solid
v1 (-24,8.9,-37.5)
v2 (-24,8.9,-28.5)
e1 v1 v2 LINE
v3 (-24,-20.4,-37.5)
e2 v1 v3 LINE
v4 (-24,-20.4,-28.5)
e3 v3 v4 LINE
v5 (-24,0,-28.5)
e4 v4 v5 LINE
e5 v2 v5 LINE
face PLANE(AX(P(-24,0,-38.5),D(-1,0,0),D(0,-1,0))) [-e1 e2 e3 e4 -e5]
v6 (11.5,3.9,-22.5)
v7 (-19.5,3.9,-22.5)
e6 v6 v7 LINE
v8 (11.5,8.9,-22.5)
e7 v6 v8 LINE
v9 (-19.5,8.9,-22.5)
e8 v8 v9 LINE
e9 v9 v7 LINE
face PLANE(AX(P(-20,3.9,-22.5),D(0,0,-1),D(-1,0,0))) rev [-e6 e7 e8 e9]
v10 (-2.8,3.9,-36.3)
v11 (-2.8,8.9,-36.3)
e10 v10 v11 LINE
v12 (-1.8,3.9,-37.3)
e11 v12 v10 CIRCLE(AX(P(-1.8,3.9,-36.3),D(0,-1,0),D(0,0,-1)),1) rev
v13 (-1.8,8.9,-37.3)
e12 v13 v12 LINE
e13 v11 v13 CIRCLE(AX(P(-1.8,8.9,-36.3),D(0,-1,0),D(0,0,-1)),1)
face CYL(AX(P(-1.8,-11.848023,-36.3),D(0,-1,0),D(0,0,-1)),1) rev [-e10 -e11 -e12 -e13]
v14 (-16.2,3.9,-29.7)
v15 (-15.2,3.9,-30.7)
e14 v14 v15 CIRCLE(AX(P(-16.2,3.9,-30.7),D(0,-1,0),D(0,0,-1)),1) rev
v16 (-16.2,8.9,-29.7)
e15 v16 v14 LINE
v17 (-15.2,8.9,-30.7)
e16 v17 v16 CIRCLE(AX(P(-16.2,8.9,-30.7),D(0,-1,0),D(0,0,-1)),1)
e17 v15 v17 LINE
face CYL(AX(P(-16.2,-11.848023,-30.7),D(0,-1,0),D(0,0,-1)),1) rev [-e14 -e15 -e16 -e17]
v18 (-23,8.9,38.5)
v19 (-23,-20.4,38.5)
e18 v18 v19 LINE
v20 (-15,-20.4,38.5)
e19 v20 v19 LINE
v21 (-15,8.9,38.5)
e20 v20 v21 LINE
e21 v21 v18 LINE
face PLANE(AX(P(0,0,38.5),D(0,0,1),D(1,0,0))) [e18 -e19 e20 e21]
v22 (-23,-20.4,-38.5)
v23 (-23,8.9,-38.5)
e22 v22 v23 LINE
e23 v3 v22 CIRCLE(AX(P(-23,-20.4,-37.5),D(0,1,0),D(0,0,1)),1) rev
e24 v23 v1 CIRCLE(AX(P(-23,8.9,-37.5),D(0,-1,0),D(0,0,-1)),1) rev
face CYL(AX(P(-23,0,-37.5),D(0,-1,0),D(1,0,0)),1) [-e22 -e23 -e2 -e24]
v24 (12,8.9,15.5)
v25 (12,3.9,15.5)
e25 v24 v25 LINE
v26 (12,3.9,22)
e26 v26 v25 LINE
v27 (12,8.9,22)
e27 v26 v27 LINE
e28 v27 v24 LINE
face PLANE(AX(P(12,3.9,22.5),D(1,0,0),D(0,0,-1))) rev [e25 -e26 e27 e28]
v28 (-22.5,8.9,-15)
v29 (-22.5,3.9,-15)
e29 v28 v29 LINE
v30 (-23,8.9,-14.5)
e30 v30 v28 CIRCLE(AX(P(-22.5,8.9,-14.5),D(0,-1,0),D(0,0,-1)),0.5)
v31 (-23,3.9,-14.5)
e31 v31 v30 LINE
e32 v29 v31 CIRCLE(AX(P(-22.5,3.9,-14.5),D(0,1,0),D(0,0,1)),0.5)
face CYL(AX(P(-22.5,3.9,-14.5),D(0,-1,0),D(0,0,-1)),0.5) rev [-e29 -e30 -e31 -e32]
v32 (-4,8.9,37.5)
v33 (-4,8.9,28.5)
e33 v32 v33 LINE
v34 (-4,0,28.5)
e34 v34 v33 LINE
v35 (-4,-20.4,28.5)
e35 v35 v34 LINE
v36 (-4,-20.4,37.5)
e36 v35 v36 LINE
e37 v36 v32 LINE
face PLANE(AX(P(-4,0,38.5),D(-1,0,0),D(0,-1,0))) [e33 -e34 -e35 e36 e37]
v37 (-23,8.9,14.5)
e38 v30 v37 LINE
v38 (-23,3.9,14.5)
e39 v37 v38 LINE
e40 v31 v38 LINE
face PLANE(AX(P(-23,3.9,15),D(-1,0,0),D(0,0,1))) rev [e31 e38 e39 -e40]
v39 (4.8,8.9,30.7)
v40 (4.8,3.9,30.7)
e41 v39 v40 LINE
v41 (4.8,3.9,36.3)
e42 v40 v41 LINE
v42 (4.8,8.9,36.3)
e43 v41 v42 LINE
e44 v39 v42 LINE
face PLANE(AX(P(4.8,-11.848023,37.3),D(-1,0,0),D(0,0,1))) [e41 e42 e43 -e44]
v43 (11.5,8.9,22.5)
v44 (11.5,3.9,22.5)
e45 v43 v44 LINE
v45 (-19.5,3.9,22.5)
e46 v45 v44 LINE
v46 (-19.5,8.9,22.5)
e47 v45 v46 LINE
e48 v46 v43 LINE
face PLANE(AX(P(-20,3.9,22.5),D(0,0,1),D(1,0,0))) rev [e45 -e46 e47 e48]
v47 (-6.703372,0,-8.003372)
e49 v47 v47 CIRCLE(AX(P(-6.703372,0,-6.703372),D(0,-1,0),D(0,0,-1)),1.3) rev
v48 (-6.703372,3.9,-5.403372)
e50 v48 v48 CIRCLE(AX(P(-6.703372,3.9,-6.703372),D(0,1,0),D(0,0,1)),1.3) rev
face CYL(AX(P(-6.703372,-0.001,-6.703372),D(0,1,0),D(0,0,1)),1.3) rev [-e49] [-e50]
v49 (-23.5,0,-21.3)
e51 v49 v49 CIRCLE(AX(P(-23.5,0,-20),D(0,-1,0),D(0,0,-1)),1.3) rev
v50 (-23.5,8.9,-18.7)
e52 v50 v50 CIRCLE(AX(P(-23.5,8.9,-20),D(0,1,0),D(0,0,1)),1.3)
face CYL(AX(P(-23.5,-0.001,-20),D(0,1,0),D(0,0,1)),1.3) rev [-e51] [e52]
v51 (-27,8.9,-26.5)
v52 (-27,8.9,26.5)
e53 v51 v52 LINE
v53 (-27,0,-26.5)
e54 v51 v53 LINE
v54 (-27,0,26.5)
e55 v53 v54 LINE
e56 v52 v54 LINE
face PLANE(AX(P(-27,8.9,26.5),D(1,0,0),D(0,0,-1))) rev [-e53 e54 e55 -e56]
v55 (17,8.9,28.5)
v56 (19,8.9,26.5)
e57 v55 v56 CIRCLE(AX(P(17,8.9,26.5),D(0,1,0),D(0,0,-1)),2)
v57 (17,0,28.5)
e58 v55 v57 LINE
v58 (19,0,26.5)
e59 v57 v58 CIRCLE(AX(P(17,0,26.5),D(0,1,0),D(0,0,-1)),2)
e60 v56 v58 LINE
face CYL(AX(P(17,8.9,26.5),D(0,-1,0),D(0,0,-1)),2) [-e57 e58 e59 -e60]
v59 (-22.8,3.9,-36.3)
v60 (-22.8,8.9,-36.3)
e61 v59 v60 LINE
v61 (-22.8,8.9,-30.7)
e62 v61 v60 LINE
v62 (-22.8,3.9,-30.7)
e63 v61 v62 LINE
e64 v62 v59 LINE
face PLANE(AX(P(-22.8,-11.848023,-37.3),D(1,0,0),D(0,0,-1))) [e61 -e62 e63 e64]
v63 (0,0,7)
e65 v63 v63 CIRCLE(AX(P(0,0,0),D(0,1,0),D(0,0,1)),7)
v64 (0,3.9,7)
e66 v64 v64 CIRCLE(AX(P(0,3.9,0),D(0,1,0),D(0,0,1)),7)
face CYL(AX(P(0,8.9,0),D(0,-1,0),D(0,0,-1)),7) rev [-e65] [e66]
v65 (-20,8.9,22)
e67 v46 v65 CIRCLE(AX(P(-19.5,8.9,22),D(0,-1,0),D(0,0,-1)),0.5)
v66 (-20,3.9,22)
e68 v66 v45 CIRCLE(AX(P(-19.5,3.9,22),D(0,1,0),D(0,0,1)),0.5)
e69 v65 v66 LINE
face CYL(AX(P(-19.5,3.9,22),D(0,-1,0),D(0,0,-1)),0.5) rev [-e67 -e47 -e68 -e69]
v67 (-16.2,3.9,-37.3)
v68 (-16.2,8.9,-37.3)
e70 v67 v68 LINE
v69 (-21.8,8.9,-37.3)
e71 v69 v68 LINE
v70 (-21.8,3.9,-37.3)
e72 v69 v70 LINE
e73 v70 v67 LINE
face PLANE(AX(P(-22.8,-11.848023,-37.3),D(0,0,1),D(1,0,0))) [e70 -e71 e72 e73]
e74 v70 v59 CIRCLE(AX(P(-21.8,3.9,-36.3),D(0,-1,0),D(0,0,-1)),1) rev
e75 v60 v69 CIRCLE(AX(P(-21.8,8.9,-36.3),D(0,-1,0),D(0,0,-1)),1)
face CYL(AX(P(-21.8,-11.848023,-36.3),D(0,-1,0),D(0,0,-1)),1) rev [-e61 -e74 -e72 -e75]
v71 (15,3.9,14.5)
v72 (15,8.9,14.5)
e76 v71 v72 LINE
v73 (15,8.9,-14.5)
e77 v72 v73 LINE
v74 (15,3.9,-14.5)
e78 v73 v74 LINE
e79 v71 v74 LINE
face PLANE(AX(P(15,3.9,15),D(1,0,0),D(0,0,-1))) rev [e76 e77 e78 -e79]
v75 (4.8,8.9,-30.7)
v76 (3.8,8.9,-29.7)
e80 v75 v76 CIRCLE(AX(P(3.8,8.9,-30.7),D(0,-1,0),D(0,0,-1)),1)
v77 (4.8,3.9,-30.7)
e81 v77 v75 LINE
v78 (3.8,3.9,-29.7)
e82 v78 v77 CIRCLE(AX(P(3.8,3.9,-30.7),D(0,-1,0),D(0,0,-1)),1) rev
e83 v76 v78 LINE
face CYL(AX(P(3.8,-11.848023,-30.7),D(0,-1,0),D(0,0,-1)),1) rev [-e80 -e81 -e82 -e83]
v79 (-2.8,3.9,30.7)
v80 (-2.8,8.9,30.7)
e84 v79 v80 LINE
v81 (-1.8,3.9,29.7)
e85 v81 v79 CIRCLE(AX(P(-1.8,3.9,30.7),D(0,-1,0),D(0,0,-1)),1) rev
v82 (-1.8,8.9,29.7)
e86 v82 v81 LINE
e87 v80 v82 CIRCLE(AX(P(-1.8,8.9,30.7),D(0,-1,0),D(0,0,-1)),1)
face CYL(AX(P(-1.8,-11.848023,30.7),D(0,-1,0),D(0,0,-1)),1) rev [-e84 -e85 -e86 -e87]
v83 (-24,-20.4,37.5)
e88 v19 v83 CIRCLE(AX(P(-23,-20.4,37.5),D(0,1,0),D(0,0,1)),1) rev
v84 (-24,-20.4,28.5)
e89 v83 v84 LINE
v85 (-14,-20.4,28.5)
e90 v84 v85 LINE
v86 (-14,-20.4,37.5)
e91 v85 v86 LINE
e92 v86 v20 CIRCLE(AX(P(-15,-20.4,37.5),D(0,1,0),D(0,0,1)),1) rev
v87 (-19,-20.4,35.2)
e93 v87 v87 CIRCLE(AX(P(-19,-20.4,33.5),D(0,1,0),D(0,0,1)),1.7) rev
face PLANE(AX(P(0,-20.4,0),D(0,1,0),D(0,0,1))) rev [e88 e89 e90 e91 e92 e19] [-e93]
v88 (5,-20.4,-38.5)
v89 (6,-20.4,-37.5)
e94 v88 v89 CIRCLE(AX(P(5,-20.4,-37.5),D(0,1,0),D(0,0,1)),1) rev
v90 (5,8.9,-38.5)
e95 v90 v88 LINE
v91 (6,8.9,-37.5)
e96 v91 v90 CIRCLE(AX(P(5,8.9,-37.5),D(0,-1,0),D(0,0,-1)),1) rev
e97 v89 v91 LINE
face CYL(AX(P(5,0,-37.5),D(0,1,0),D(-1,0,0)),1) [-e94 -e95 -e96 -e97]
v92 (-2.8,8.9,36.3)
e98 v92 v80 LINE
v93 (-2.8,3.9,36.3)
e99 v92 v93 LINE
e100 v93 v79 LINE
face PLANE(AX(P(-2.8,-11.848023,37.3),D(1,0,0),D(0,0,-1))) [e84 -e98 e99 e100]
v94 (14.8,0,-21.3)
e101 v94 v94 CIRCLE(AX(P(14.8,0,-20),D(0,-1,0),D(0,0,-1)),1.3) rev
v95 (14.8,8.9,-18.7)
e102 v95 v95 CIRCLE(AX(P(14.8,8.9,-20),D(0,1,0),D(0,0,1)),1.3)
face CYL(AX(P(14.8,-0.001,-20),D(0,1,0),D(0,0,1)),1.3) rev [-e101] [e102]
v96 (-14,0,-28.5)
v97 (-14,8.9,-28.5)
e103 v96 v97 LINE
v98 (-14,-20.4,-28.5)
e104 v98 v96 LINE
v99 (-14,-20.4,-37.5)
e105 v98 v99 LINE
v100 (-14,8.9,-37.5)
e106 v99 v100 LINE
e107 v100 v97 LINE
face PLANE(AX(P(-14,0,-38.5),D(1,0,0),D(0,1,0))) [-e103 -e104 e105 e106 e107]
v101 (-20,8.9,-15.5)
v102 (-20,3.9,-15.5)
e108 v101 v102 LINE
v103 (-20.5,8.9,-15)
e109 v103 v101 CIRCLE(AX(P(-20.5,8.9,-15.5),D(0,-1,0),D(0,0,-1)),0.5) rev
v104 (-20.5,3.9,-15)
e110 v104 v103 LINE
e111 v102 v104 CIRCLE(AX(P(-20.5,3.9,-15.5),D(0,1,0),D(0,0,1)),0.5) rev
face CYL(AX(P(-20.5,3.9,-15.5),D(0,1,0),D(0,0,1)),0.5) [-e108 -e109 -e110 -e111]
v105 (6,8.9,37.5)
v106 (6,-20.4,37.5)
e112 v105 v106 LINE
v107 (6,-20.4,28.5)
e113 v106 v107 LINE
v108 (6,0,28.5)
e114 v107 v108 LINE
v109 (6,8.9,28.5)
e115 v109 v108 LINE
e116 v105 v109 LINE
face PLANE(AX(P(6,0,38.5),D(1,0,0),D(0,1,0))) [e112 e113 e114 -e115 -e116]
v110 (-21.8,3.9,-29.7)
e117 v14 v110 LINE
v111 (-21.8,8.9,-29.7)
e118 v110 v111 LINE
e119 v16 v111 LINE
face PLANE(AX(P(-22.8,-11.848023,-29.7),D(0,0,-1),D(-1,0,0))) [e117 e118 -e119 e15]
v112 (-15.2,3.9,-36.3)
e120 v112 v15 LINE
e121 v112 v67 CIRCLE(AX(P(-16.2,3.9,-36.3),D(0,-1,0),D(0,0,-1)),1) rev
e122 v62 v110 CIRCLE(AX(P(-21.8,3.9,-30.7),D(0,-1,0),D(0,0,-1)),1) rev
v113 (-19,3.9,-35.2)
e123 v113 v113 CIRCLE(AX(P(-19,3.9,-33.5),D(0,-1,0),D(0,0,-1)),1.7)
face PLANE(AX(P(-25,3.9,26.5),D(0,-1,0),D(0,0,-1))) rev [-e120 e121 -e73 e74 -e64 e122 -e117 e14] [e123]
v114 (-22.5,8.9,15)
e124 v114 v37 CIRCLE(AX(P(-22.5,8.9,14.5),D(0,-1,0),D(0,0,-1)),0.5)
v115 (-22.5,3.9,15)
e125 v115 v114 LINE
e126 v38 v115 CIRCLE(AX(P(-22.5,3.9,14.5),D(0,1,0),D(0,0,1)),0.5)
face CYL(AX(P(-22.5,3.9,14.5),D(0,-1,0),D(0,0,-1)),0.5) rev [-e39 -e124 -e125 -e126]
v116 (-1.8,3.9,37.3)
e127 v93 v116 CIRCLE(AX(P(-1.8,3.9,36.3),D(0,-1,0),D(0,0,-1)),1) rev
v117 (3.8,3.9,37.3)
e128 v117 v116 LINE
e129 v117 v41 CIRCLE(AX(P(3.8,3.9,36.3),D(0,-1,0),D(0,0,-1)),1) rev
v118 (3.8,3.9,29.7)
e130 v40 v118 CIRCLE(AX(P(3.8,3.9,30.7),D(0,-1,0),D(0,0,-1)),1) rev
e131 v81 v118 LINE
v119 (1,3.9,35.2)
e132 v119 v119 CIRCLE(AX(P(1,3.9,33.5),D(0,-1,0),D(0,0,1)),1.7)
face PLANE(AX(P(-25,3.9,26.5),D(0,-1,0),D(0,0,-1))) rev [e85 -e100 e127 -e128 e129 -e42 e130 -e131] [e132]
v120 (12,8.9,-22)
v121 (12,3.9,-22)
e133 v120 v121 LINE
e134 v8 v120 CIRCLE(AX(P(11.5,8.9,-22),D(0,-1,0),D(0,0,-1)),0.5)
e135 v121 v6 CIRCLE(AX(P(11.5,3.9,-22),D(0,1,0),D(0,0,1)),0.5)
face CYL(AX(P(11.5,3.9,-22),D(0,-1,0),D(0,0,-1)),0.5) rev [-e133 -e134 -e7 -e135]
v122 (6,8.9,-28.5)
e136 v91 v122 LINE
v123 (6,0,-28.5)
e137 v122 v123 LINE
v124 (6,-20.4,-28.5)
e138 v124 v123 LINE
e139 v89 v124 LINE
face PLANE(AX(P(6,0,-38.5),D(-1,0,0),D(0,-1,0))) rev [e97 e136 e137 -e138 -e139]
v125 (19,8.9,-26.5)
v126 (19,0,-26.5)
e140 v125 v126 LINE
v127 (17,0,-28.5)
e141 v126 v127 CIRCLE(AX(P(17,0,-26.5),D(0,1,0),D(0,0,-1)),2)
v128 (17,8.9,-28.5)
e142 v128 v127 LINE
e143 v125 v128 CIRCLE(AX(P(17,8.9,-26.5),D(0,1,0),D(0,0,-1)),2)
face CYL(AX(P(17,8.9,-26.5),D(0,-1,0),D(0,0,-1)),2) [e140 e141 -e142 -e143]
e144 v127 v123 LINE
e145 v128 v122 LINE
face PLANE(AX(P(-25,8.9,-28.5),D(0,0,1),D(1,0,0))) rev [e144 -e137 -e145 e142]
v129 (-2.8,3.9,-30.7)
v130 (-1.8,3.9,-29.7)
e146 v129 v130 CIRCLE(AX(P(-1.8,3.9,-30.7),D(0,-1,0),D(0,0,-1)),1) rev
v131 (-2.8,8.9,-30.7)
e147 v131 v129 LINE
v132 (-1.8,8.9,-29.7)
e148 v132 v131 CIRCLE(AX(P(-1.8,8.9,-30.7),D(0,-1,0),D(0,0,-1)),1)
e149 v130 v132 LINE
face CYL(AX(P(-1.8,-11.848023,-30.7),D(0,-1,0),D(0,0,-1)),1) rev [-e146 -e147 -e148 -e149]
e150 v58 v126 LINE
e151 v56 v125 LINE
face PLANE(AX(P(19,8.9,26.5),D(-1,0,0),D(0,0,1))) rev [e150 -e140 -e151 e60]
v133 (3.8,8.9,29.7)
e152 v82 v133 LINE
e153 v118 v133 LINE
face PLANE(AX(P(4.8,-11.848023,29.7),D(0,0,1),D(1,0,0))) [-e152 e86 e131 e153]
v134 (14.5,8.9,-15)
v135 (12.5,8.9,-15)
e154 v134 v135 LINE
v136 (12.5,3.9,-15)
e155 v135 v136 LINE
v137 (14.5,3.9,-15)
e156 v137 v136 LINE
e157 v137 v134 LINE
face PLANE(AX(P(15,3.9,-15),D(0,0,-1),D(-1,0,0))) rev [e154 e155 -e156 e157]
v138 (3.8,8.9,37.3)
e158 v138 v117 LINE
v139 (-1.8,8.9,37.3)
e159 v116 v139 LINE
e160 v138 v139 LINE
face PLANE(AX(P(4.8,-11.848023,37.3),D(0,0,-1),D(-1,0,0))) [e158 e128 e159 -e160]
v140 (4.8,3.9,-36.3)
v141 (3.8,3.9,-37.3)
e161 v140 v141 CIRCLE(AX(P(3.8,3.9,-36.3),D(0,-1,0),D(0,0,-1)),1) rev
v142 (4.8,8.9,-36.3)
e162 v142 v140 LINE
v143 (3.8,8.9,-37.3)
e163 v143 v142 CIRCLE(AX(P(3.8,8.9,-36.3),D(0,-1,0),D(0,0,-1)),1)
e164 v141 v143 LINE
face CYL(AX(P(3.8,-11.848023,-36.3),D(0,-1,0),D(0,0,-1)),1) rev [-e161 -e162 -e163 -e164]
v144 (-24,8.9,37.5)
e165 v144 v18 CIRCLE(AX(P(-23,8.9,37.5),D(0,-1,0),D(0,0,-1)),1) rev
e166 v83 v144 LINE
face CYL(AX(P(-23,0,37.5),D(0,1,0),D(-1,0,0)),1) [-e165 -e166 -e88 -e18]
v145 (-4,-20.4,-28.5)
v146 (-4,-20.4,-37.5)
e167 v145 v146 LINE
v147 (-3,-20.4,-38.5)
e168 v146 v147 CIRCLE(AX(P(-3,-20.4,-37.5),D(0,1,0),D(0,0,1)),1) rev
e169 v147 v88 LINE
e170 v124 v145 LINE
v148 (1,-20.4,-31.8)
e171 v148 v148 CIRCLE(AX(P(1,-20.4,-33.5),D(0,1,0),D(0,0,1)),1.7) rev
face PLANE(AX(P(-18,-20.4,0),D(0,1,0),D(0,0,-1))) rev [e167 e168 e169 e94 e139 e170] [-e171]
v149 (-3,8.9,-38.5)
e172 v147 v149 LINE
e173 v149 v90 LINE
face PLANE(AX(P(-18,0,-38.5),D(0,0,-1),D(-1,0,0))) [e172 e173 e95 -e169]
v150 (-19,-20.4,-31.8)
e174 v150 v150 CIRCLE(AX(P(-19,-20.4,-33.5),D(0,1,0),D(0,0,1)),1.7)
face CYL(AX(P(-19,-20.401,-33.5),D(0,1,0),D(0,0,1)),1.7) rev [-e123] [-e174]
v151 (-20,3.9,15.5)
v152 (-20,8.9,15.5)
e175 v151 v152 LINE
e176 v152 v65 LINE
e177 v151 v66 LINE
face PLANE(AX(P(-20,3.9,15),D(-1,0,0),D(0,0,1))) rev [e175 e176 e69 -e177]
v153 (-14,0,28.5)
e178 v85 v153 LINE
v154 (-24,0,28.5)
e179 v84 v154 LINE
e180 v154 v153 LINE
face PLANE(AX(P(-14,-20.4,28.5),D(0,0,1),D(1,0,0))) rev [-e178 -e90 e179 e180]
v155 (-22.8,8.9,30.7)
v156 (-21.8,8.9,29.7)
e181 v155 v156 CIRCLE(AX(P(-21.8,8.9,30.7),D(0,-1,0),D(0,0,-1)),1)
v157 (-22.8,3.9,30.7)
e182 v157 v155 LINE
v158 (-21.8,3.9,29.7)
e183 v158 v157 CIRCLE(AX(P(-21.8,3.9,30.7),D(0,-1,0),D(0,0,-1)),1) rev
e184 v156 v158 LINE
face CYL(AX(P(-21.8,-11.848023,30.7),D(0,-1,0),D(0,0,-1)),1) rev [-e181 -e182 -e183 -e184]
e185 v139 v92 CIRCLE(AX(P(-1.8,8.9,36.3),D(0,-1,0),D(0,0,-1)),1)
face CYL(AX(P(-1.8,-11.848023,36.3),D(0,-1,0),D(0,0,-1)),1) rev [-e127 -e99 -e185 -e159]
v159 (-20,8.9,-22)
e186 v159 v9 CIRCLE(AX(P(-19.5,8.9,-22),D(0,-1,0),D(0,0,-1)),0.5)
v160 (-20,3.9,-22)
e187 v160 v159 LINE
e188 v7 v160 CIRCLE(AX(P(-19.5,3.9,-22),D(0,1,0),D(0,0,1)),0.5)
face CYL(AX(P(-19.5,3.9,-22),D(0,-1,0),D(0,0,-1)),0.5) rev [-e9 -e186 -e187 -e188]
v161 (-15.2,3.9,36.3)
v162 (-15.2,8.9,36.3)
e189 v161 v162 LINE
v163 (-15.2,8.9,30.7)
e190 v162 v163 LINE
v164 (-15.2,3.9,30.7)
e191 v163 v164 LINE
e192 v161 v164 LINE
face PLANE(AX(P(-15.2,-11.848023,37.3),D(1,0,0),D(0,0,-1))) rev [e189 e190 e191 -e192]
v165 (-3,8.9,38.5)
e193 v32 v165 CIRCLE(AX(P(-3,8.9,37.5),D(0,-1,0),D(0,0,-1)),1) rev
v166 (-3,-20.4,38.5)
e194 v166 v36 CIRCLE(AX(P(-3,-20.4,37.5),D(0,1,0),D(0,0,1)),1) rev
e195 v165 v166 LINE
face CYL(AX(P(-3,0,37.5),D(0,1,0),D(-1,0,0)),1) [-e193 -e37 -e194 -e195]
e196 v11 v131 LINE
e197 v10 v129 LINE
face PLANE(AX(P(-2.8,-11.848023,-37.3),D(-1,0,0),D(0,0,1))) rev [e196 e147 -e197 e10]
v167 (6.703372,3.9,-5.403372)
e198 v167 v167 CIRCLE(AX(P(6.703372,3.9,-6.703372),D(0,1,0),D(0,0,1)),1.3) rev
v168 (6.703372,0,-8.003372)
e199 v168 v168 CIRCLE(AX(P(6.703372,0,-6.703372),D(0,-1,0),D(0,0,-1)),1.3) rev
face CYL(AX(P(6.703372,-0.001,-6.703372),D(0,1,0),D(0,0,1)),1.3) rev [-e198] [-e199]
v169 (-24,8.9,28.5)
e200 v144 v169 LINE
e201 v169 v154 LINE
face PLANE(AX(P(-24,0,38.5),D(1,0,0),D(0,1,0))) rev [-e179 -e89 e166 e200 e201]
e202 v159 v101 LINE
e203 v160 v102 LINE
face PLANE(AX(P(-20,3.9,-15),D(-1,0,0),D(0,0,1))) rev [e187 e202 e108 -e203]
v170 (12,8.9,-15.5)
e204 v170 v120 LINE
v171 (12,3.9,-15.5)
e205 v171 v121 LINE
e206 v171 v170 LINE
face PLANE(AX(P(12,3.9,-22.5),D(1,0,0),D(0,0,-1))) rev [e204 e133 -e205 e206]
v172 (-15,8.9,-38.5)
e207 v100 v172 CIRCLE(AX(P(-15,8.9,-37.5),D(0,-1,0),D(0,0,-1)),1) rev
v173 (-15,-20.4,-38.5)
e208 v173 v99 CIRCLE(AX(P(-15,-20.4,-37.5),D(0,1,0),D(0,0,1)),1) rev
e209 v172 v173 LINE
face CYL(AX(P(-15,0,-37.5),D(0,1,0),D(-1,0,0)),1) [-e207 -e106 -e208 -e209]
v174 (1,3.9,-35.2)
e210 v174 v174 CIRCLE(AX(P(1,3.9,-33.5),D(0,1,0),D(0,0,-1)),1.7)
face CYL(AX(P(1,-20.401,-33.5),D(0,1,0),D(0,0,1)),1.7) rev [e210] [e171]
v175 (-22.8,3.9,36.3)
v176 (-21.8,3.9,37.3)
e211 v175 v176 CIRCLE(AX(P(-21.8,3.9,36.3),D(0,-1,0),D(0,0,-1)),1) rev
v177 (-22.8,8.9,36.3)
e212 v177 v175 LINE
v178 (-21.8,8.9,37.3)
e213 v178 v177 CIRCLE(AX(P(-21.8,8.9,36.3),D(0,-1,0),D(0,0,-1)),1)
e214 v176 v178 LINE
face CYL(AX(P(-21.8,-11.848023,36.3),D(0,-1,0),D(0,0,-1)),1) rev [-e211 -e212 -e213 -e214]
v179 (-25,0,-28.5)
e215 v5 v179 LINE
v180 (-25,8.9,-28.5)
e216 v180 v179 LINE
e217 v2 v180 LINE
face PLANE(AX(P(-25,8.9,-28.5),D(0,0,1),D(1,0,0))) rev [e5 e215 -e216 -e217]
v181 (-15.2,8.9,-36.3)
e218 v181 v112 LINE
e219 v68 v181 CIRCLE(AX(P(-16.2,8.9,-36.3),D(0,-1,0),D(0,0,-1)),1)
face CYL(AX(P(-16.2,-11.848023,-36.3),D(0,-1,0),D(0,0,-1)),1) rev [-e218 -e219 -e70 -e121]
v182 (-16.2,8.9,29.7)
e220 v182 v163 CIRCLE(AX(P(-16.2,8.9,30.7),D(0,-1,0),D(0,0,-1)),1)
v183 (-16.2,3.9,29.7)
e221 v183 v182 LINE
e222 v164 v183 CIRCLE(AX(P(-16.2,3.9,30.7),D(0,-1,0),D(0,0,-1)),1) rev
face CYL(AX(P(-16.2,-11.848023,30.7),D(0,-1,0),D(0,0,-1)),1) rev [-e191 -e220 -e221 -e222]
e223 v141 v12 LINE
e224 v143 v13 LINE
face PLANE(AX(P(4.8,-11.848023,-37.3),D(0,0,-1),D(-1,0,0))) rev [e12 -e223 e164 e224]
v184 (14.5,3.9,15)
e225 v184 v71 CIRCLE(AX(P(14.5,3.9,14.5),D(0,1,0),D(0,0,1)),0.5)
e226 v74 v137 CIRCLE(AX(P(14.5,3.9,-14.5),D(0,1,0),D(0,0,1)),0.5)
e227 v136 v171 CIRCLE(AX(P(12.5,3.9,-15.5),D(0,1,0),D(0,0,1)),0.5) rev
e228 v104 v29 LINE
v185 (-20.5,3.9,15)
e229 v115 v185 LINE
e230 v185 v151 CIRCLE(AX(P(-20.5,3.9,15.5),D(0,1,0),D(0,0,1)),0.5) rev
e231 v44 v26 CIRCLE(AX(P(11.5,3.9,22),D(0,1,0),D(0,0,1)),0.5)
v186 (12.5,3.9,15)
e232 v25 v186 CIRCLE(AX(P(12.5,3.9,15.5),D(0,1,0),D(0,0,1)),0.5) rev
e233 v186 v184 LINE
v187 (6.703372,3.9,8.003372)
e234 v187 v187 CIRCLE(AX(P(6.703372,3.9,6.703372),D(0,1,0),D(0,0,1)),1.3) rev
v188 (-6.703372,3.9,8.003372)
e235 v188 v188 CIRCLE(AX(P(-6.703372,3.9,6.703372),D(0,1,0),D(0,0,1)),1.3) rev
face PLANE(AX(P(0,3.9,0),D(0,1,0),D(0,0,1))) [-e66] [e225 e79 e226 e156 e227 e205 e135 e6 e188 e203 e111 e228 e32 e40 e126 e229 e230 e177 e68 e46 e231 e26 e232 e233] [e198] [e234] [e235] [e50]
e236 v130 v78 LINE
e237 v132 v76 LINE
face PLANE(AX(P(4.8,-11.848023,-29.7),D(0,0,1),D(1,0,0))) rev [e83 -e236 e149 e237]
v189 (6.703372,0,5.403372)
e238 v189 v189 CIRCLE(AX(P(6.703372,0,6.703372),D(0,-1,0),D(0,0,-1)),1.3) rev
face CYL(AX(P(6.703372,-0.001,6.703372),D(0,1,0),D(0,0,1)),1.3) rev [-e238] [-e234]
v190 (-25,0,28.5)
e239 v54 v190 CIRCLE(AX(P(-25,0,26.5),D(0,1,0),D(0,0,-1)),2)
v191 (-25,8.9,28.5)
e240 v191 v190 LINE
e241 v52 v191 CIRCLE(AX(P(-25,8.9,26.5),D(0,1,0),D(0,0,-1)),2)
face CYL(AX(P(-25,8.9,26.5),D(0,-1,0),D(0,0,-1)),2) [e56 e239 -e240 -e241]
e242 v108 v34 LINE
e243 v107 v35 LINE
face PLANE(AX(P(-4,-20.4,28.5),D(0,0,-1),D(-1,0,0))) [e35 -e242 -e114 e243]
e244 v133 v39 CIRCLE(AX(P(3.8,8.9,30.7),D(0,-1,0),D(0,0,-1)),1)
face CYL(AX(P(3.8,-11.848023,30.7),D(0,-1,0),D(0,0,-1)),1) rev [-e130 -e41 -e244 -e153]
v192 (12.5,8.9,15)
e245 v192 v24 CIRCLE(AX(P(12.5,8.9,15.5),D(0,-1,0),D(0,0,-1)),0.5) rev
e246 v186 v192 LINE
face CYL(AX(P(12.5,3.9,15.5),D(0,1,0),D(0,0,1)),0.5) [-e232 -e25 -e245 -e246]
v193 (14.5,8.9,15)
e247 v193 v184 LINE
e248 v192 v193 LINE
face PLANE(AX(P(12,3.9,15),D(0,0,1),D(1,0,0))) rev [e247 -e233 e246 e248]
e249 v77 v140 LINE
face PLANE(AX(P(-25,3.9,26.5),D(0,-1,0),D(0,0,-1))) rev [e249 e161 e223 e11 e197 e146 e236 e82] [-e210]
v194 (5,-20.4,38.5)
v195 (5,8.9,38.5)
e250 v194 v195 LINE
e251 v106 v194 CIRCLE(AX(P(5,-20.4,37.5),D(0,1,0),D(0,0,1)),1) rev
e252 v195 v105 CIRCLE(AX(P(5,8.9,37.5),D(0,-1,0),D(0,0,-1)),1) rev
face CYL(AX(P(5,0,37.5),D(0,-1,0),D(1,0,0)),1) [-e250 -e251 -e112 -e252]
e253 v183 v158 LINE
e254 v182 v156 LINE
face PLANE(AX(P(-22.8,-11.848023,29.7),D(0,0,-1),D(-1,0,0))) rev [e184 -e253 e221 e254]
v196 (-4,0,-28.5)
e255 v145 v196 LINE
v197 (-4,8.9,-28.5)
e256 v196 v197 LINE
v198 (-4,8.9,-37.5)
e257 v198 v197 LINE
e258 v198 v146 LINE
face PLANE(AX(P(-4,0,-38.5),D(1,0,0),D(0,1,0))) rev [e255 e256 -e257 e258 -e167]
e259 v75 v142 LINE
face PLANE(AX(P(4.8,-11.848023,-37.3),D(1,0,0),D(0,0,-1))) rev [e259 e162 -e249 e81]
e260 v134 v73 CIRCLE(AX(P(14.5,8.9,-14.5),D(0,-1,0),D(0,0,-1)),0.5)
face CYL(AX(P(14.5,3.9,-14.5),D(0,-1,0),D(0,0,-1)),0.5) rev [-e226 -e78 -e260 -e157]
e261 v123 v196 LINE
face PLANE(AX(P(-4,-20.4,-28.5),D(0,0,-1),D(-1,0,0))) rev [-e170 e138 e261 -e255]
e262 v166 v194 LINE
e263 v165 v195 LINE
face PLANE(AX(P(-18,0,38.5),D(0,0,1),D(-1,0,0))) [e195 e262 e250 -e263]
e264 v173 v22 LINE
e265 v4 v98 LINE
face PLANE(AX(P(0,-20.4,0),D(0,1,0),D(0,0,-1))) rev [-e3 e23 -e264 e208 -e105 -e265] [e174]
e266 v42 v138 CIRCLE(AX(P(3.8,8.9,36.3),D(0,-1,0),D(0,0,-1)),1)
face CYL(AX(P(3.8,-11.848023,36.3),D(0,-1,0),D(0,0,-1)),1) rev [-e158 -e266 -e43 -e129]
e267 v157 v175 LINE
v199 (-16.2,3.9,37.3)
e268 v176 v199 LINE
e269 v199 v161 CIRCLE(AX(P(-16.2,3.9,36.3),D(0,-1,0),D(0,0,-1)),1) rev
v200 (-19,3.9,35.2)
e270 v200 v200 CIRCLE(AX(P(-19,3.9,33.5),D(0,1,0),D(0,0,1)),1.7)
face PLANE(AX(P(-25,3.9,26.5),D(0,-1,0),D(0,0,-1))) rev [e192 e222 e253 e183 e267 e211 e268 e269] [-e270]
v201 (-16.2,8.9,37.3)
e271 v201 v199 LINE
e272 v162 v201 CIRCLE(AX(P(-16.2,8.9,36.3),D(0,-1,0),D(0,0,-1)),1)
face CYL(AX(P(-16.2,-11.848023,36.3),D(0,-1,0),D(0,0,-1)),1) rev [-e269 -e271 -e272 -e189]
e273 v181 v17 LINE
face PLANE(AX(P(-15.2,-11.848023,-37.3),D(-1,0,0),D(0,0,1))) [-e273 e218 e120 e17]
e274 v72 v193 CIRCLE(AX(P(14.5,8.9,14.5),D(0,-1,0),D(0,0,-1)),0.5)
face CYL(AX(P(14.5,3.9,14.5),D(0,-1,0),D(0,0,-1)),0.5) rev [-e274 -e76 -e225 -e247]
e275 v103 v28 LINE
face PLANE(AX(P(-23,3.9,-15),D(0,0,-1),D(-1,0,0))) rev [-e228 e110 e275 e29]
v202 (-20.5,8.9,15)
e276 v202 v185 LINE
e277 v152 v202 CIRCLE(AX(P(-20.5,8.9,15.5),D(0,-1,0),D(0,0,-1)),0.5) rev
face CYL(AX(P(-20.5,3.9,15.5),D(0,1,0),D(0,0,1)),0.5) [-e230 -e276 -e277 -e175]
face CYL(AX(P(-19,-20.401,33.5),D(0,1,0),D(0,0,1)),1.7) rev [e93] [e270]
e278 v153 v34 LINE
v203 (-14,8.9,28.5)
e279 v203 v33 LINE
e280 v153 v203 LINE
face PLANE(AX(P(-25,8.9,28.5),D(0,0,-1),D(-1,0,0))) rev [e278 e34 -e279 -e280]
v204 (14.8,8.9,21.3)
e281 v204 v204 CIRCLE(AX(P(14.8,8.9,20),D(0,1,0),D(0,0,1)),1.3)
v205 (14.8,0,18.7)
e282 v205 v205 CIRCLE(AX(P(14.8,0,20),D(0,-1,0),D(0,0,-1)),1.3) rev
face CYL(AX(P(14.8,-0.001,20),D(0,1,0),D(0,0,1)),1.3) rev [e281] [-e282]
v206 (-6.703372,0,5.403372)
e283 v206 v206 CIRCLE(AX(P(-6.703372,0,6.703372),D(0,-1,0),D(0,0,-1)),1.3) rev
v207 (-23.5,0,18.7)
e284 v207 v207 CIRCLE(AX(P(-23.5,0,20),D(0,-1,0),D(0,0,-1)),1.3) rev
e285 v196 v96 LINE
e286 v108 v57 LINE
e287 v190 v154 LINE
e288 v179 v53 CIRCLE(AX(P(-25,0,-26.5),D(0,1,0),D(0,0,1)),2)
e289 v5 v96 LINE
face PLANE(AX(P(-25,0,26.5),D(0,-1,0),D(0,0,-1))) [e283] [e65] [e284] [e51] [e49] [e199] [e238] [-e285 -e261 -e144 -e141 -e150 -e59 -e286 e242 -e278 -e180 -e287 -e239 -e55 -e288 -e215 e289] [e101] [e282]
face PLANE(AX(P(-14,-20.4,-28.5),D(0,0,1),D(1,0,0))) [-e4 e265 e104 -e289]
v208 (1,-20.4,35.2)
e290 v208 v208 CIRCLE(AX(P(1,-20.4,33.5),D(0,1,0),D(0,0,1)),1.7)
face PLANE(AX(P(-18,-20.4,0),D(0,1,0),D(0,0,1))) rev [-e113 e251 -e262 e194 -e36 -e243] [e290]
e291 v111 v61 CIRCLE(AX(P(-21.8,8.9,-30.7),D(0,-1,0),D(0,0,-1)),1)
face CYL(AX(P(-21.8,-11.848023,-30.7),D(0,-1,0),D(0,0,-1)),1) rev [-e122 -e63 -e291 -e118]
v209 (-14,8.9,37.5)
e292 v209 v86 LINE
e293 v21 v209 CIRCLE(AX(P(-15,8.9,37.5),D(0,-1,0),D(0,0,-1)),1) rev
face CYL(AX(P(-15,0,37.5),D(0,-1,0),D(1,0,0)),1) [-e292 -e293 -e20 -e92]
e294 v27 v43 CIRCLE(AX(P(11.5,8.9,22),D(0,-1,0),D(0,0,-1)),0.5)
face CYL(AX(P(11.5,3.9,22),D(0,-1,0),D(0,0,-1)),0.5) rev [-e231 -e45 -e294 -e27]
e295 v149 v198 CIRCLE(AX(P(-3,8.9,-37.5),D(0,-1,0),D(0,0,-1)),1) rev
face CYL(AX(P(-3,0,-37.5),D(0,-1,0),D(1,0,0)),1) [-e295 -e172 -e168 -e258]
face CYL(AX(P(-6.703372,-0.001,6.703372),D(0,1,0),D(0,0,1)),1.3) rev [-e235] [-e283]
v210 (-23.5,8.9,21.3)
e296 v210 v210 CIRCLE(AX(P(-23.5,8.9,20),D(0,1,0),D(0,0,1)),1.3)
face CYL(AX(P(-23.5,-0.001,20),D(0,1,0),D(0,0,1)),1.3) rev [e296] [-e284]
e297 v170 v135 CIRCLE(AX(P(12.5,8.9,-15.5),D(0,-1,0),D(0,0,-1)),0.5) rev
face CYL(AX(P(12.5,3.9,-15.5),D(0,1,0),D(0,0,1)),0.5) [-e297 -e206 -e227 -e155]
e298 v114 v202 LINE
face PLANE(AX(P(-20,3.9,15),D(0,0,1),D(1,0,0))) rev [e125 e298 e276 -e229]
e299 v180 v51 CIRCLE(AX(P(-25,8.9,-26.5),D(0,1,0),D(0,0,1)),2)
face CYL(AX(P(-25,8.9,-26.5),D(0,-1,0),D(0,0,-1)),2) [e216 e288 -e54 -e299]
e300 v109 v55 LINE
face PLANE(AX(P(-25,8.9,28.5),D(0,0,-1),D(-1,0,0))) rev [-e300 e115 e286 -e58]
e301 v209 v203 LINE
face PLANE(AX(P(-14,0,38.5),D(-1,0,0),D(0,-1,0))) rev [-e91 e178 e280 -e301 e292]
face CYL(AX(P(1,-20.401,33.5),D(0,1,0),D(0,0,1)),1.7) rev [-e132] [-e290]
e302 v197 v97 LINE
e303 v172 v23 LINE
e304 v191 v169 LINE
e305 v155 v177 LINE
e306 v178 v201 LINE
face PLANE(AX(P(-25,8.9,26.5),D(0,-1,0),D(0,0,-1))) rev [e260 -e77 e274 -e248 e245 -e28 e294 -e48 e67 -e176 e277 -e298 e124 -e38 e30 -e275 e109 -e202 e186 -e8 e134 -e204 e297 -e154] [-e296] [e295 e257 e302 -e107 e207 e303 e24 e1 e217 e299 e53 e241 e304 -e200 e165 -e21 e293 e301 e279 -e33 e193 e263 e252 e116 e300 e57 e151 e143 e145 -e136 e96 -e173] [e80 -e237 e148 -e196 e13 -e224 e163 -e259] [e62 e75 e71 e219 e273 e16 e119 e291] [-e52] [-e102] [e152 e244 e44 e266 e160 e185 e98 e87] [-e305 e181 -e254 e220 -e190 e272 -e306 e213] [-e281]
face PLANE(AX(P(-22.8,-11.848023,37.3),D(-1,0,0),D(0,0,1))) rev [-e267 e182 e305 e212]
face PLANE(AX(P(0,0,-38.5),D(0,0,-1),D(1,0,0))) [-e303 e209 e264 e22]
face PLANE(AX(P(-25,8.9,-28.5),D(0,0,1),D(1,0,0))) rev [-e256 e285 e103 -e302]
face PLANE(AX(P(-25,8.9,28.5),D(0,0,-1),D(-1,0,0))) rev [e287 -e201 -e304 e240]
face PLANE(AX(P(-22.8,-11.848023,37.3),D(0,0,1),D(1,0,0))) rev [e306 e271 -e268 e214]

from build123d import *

# Parameters (mm, degrees)
SKETCH1_R            = 7
BOSS_EXTRUDE1_DEPTH  = 8.9
CUT_EXTRUDE1_REACH   = 42.255
SKETCH6_R            = 1.3
CIRPATTERN1_COUNT    = 4
CUT_EXTRUDE2_REACH   = 42.255
SKETCH7_R            = 1.3
CUT_EXTRUDE3_DEPTH   = 5
SKETCH10_W           = 10
SKETCH10_H           = 8.9
BOSS_EXTRUDE2_DEPTH  = 10
SKETCH11_W           = 10
SKETCH11_H           = 10
BOSS_EXTRUDE3_DEPTH  = 20.4
SKETCH12_W           = 7.6
SKETCH12_H           = 7.6
CUT_EXTRUDE4_DEPTH   = 5
CUT_EXTRUDE5_REACH   = 54.931
SKETCH13_R           = 1.7
FILLET1_R            = 1
FILLET1_OF_MIRROR2_R = 1
MIRROR3_START        = -20.4
MIRROR3_OUTLINE_R    = 1.7
MIRROR3_DEPTH        = 24.3
MIRROR3_START_2      = 3.9
MIRROR3_2_DEPTH      = 5
FILLET2_R            = 0.5


# Read off the part's stored shape, not the designer's step: Mirror3
with BuildPart() as part:
    # Sketch1 → Boss-Extrude1 (new body)
    with BuildSketch(Plane(origin=(0, 0, 0), x_dir=(1, 0, 0), z_dir=(0, 1, 0))):
        with BuildLine():
            Line((-25, -28.5), (17, -28.5))
            ThreePointArc((17, -28.5), (18.414213562, -27.914213562), (19, -26.5))
            Line((19, -26.5), (19, 26.5))
            ThreePointArc((19, 26.5), (18.414213562, 27.914213562), (17, 28.5))
            Line((17, 28.5), (-25, 28.5))
            ThreePointArc((-25, 28.5), (-26.414213562, 27.914213562), (-27, 26.5))
            Line((-27, 26.5), (-27, -26.5))
            ThreePointArc((-27, -26.5), (-26.414213562, -27.914213562), (-25, -28.5))
        make_face()
        with Locations(Location((0, 0, 0), (0, 0, 270))):
            Circle(SKETCH1_R, mode=Mode.SUBTRACT)
    extrude(amount=BOSS_EXTRUDE1_DEPTH)

    # Sketch6 → Cut-Extrude1 (cut, up to next)
    with BuildSketch(Plane(origin=(0, 8.9, 0), x_dir=(1, 0, 0), z_dir=(0, 1, 0)), mode=Mode.PRIVATE) as cut_extrude1_sk1:
        with Locations(Location((-6.703372286, -6.703372286, 0), (0, 0, 270))):
            Circle(SKETCH6_R)
    cut_extrude1_tool1 = extrude(cut_extrude1_sk1.sketch, amount=-CUT_EXTRUDE1_REACH, mode=Mode.PRIVATE) & part.part
    cut_extrude1 = cut_extrude1_tool1.solids().sort_by_distance((-6.703372, 8.9, 6.703372))[0]
    add(cut_extrude1, mode=Mode.SUBTRACT)

    # CirPattern1: Cut-Extrude1 ×4 about axis
    cirpattern1_axis = Axis((0, 0, 0), (0, 1, 0))
    for i in range(1, CIRPATTERN1_COUNT):
        add(cut_extrude1.rotate(cirpattern1_axis, i * 360 / CIRPATTERN1_COUNT), mode=Mode.SUBTRACT)

    # Sketch7 → Cut-Extrude2 (cut, up to next)
    with BuildSketch(Plane(origin=(0, 8.9, 0), x_dir=(1, 0, 0), z_dir=(0, 1, 0)), mode=Mode.PRIVATE) as cut_extrude2_sk1:
        with Locations(Location((-23.5, -20, 0), (0, 0, 270))):
            Circle(SKETCH7_R)
    cut_extrude2_tool1 = extrude(cut_extrude2_sk1.sketch, amount=-CUT_EXTRUDE2_REACH, mode=Mode.PRIVATE) & part.part
    # Sketch7 → Cut-Extrude2 (cut, up to next)
    with BuildSketch(Plane(origin=(0, 8.9, 0), x_dir=(1, 0, 0), z_dir=(0, 1, 0)), mode=Mode.PRIVATE) as cut_extrude2_sk2:
        with Locations(Location((-23.5, 20, 0), (0, 0, 270))):
            Circle(SKETCH7_R)
    cut_extrude2_tool2 = extrude(cut_extrude2_sk2.sketch, amount=-CUT_EXTRUDE2_REACH, mode=Mode.PRIVATE) & part.part
    # Sketch7 → Cut-Extrude2 (cut, up to next)
    with BuildSketch(Plane(origin=(0, 8.9, 0), x_dir=(1, 0, 0), z_dir=(0, 1, 0)), mode=Mode.PRIVATE) as cut_extrude2_sk3:
        with Locations(Location((14.8, -20, 0), (0, 0, 270))):
            Circle(SKETCH7_R)
    cut_extrude2_tool3 = extrude(cut_extrude2_sk3.sketch, amount=-CUT_EXTRUDE2_REACH, mode=Mode.PRIVATE) & part.part
    # Sketch7 → Cut-Extrude2 (cut, up to next)
    with BuildSketch(Plane(origin=(0, 8.9, 0), x_dir=(1, 0, 0), z_dir=(0, 1, 0)), mode=Mode.PRIVATE) as cut_extrude2_sk4:
        with Locations(Location((14.8, 20, 0), (0, 0, 270))):
            Circle(SKETCH7_R)
    cut_extrude2_tool4 = extrude(cut_extrude2_sk4.sketch, amount=-CUT_EXTRUDE2_REACH, mode=Mode.PRIVATE) & part.part
    add(cut_extrude2_tool1.solids().sort_by_distance((-23.5, 8.9, 20))[0], mode=Mode.SUBTRACT)
    add(cut_extrude2_tool2.solids().sort_by_distance((-23.5, 8.9, -20))[0], mode=Mode.SUBTRACT)
    add(cut_extrude2_tool3.solids().sort_by_distance((14.8, 8.9, 20))[0], mode=Mode.SUBTRACT)
    add(cut_extrude2_tool4.solids().sort_by_distance((14.8, 8.9, -20))[0], mode=Mode.SUBTRACT)

    # Sketch8 → Cut-Extrude3 (cut)
    with BuildSketch(Plane(origin=(0, 8.9, 0), x_dir=(1, 0, 0), z_dir=(0, 1, 0))):
        Polygon((-20, -15), (-20, -22.5), (12, -22.5), (12, -15), (15, -15), (15, 15), (12, 15), (12, 22.5), (-20, 22.5), (-20, 15), (-23, 15), (-23, -15), align=None)
    extrude(amount=-CUT_EXTRUDE3_DEPTH, mode=Mode.SUBTRACT)

    # Sketch10 → Boss-Extrude2 (add)
    with BuildSketch(Plane.XY.offset(28.5)):
        with Locations((-19, 4.45)):
            Rectangle(SKETCH10_W, SKETCH10_H)
    boss_extrude2 = extrude(amount=BOSS_EXTRUDE2_DEPTH)

    # Sketch11 → Boss-Extrude3 (add)
    with BuildSketch(Plane.XZ):
        with Locations((-19, 33.5)):
            Rectangle(SKETCH11_W, SKETCH11_H)
    boss_extrude3 = extrude(amount=BOSS_EXTRUDE3_DEPTH)

    # Sketch12 → Cut-Extrude4 (cut)
    with BuildSketch(Plane(origin=(0, 8.9, 0), x_dir=(1, 0, 0), z_dir=(0, 1, 0))):
        with Locations((-19, -33.5)):
            Rectangle(SKETCH12_W, SKETCH12_H)
    cut_extrude4 = extrude(amount=-CUT_EXTRUDE4_DEPTH, mode=Mode.SUBTRACT)

    # Sketch13 → Cut-Extrude5 (cut, up to next)
    with BuildSketch(Plane(origin=(0, 3.9, 0), x_dir=(1, 0, 0), z_dir=(0, 1, 0)), mode=Mode.PRIVATE) as cut_extrude5_sk1:
        with Locations(Location((-19, -33.5, 0), (0, 0, 270))):
            Circle(SKETCH13_R)
    cut_extrude5_tool1 = extrude(cut_extrude5_sk1.sketch, amount=-CUT_EXTRUDE5_REACH, mode=Mode.PRIVATE) & part.part
    cut_extrude5 = cut_extrude5_tool1.solids().sort_by_distance((-19, 3.9, 33.5))[0]
    add(cut_extrude5, mode=Mode.SUBTRACT)

    # Fillet1
    fillet1_edges = [part.edges().sort_by_distance(p)[0] for p in [
        (-24, -5.75, 38.5),
        (-14, -5.75, 38.5),
        (-22.8, 6.4, 29.7),
        (-22.8, 6.4, 37.3),
        (-15.2, 6.4, 37.3),
        (-15.2, 6.4, 29.7),
    ]]
    fillet(fillet1_edges, radius=FILLET1_R)

    # Mirror2: Boss-Extrude2, Boss-Extrude3, Cut-Extrude4, Cut-Extrude5 across plane
    add(boss_extrude2.mirror(Plane.ZY.offset(9)))
    add(boss_extrude3.mirror(Plane.ZY.offset(9)))
    add(cut_extrude4.mirror(Plane.ZY.offset(9)), mode=Mode.SUBTRACT)
    add(cut_extrude5.mirror(Plane.ZY.offset(9)), mode=Mode.SUBTRACT)

    # Fillet1 of Mirror2
    fillet1_of_mirror2_edges = [part.edges().sort_by_distance(p)[0] for p in [
        (6, -5.75, 38.5),
        (-4, -5.75, 38.5),
        (4.8, 6.4, 29.7),
        (4.8, 6.4, 37.3),
        (-2.8, 6.4, 37.3),
        (-2.8, 6.4, 29.7),
    ]]
    fillet(fillet1_of_mirror2_edges, radius=FILLET1_OF_MIRROR2_R)

    # Mirror3 outline → Mirror3 (add)
    # profile 1 of 2: a face of its own
    with BuildSketch(Plane(origin=(0, 0, 0), x_dir=(1, 0, 0), z_dir=(0, 1, 0)).offset(MIRROR3_START)):
        with BuildLine():
            ThreePointArc((-23, 38.5), (-23.707106781, 38.207106781), (-24, 37.5))
            Line((-24, 37.5), (-24, 28.5))
            Line((-24, 28.5), (-14, 28.5))
            Line((-14, 28.5), (-14, 37.5))
            ThreePointArc((-14, 37.5), (-14.292893219, 38.207106781), (-15, 38.5))
            Line((-15, 38.5), (-23, 38.5))
        make_face()
        with Locations((-19, 33.5)):
            Circle(MIRROR3_OUTLINE_R, mode=Mode.SUBTRACT)
    # profile 2 of 2: a face of its own
    with BuildSketch(Plane(origin=(0, 0, 0), x_dir=(1, 0, 0), z_dir=(0, 1, 0)).offset(MIRROR3_START)):
        with BuildLine():
            Line((-4, 37.5), (-4, 28.5))
            Line((-4, 28.5), (6, 28.5))
            Line((6, 28.5), (6, 37.5))
            ThreePointArc((6, 37.5), (5.707106781, 38.207106781), (5, 38.5))
            Line((5, 38.5), (-3, 38.5))
            ThreePointArc((-3, 38.5), (-3.707106781, 38.207106781), (-4, 37.5))
        make_face()
        with Locations((1, 33.5)):
            Circle(MIRROR3_OUTLINE_R, mode=Mode.SUBTRACT)
    extrude(amount=MIRROR3_DEPTH)

    # Mirror3 2 outline → Mirror3 2 (add)
    # profile 1 of 2: a face of its own
    with BuildSketch(Plane(origin=(0, 0, 0), x_dir=(1, 0, 0), z_dir=(0, 1, 0)).offset(MIRROR3_START_2)):
        with BuildLine():
            ThreePointArc((-23, 38.5), (-23.707106781, 38.207106781), (-24, 37.5))
            Line((-24, 37.5), (-24, 28.5))
            Line((-24, 28.5), (-14, 28.5))
            Line((-14, 28.5), (-14, 37.5))
            ThreePointArc((-14, 37.5), (-14.292893219, 38.207106781), (-15, 38.5))
            Line((-15, 38.5), (-23, 38.5))
        make_face()
        with BuildLine():
            ThreePointArc((-21.8, 29.7), (-22.507106781, 29.992893219), (-22.8, 30.7))
            Line((-22.8, 30.7), (-22.8, 36.3))
            ThreePointArc((-22.8, 36.3), (-22.507106781, 37.007106781), (-21.8, 37.3))
            Line((-21.8, 37.3), (-16.2, 37.3))
            ThreePointArc((-16.2, 37.3), (-15.492893219, 37.007106781), (-15.2, 36.3))
            Line((-15.2, 36.3), (-15.2, 30.7))
            ThreePointArc((-15.2, 30.7), (-15.492893219, 29.992893219), (-16.2, 29.7))
            Line((-16.2, 29.7), (-21.8, 29.7))
        make_face(mode=Mode.SUBTRACT)
    # profile 2 of 2: a face of its own
    with BuildSketch(Plane(origin=(0, 0, 0), x_dir=(1, 0, 0), z_dir=(0, 1, 0)).offset(MIRROR3_START_2)):
        with BuildLine():
            Line((-4, 37.5), (-4, 28.5))
            Line((-4, 28.5), (6, 28.5))
            Line((6, 28.5), (6, 37.5))
            ThreePointArc((6, 37.5), (5.707106781, 38.207106781), (5, 38.5))
            Line((5, 38.5), (-3, 38.5))
            ThreePointArc((-3, 38.5), (-3.707106781, 38.207106781), (-4, 37.5))
        make_face()
        with BuildLine():
            Line((-2.8, 30.7), (-2.8, 36.3))
            ThreePointArc((-2.8, 36.3), (-2.507106781, 37.007106781), (-1.8, 37.3))
            Line((-1.8, 37.3), (3.8, 37.3))
            ThreePointArc((3.8, 37.3), (4.507106781, 37.007106781), (4.8, 36.3))
            Line((4.8, 36.3), (4.8, 30.7))
            ThreePointArc((4.8, 30.7), (4.507106781, 29.992893219), (3.8, 29.7))
            Line((3.8, 29.7), (-1.8, 29.7))
            ThreePointArc((-1.8, 29.7), (-2.507106781, 29.992893219), (-2.8, 30.7))
        make_face(mode=Mode.SUBTRACT)
    extrude(amount=MIRROR3_2_DEPTH)

    # Fillet2
    fillet2_edges = [part.edges().sort_by_distance(p)[0] for p in [
        (-23, 6.4, -15),
        (-20, 6.4, -15),
        (-20, 6.4, -22.5),
        (12, 6.4, -22.5),
        (12, 6.4, -15),
        (15, 6.4, -15),
        (15, 6.4, 15),
        (12, 6.4, 15),
        (12, 6.4, 22.5),
        (-20, 6.4, 22.5),
        (-20, 6.4, 15),
        (-23, 6.4, 15),
    ]]
    fillet(fillet2_edges, radius=FILLET2_R)


solid = part.part
